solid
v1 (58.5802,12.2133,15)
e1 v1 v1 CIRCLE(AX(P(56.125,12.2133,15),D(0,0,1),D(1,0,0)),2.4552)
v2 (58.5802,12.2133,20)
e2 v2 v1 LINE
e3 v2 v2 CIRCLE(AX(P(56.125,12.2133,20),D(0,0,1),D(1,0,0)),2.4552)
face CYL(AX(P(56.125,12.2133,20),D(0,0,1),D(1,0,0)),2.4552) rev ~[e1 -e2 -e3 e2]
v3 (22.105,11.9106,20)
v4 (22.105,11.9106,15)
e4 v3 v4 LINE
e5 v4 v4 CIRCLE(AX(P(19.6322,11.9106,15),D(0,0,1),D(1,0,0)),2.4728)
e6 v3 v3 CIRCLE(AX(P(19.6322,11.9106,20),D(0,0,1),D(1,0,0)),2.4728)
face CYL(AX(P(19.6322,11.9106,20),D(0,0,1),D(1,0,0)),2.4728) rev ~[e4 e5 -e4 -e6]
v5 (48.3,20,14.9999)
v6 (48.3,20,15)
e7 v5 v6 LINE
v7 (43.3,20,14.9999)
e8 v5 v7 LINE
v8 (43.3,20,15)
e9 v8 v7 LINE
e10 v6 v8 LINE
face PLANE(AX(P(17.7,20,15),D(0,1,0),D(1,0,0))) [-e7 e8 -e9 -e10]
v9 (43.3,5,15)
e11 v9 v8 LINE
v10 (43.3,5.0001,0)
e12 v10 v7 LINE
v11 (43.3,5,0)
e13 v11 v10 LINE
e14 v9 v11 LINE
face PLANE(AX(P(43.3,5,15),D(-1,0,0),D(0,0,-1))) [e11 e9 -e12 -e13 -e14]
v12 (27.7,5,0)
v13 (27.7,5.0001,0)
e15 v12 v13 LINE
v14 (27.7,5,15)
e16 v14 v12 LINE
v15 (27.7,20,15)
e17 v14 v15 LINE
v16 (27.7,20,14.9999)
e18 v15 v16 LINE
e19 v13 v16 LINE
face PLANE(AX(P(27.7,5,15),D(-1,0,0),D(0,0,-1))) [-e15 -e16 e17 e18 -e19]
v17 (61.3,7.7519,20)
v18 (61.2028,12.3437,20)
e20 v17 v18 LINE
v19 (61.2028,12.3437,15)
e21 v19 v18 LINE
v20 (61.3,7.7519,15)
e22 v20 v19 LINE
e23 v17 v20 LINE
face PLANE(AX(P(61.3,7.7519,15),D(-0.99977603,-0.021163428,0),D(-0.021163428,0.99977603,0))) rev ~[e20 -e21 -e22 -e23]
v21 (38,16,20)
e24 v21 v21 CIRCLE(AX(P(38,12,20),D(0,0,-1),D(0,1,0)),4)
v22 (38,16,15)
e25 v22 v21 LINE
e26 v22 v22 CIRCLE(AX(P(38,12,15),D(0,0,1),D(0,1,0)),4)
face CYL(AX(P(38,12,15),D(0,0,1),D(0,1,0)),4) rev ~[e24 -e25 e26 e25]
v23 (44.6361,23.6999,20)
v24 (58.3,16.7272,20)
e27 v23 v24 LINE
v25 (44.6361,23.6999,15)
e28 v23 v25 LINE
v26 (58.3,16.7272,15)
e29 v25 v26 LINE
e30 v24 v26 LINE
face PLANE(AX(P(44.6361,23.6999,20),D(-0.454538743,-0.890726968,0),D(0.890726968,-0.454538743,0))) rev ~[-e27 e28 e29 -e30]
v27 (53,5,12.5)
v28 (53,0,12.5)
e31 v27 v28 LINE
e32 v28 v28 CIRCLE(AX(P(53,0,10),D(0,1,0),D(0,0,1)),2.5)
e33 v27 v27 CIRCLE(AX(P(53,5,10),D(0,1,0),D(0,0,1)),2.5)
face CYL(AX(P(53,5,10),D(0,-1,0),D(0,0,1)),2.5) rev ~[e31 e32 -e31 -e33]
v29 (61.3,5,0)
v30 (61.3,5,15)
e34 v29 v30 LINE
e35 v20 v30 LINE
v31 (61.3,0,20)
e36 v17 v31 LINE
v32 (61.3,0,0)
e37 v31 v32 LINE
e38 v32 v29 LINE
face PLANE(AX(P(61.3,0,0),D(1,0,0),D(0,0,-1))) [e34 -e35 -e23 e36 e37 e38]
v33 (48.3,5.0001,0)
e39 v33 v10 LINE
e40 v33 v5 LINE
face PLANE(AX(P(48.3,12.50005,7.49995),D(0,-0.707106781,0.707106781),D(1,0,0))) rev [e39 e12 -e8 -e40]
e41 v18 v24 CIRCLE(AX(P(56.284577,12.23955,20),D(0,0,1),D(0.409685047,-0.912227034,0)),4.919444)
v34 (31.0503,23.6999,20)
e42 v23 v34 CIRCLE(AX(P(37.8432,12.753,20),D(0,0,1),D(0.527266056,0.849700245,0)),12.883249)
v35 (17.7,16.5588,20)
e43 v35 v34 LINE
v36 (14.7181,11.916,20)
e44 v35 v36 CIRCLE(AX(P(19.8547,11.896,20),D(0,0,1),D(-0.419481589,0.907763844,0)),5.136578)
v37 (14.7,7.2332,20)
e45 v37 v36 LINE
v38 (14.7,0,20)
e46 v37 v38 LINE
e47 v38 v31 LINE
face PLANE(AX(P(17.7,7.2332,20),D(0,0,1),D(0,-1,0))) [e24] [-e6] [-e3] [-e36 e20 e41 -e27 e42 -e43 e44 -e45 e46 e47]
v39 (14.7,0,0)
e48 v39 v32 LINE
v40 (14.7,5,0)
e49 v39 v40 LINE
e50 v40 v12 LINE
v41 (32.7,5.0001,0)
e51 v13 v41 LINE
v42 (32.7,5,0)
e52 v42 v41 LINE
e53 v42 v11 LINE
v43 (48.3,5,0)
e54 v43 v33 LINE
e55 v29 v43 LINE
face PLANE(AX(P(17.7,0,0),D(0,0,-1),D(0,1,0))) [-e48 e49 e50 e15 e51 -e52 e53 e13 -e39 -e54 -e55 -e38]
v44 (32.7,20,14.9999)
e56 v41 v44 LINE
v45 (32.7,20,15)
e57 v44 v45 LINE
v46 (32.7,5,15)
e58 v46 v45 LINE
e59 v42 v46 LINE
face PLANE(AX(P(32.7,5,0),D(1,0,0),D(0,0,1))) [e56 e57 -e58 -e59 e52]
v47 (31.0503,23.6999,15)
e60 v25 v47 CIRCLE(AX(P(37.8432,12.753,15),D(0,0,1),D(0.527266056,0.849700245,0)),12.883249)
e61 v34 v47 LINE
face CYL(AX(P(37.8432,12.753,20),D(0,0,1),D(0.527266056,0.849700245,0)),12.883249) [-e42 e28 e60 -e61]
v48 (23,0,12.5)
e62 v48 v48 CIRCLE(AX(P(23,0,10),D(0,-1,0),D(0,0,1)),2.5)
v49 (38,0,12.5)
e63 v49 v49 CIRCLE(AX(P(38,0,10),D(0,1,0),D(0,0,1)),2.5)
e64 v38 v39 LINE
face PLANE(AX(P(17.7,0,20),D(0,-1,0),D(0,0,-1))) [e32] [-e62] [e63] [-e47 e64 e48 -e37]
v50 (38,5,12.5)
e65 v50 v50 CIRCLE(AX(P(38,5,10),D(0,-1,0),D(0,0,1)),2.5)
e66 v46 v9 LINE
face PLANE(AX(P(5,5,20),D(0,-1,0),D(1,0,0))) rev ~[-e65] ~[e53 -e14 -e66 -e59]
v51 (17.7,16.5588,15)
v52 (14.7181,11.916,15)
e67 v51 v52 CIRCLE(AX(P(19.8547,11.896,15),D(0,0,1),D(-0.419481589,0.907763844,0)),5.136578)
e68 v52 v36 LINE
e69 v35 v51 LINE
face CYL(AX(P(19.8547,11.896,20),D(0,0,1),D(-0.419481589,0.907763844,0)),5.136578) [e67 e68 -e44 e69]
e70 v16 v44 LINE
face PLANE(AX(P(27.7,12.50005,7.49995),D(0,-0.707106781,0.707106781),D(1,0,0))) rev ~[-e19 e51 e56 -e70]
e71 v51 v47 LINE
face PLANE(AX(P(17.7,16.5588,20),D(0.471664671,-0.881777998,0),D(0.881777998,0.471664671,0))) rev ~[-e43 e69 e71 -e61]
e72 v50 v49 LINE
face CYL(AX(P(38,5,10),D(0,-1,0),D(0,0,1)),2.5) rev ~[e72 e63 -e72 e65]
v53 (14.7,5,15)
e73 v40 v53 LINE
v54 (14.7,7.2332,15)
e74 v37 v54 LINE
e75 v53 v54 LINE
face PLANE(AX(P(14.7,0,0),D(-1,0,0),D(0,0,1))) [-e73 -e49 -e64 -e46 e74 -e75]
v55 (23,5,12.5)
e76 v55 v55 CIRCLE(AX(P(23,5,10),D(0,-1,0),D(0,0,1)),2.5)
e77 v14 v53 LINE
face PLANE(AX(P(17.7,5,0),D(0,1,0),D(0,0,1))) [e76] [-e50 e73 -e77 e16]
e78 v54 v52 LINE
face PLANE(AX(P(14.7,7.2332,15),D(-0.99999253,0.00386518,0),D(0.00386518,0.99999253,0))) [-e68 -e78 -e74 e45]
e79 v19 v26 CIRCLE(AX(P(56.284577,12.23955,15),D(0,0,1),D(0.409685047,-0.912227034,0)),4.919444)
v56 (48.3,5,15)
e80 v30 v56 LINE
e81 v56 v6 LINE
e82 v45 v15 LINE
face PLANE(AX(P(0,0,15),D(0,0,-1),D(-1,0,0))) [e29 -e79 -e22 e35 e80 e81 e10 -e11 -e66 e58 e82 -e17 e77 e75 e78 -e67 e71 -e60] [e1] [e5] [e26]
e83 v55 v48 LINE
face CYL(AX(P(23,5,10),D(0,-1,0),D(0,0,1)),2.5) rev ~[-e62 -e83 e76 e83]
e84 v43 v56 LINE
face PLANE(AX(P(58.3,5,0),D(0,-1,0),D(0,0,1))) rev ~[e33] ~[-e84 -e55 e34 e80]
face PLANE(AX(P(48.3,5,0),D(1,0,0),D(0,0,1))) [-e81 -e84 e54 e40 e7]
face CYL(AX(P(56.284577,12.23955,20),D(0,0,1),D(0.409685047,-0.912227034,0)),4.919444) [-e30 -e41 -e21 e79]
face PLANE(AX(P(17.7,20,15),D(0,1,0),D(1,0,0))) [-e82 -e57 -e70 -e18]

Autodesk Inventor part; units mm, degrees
ref_plane "YZ Plane" through (0, 0, 0) normal (1, 0, 0) x (0, 1, 0)
ref_plane "XZ Plane" through (0, 0, 0) normal (0, 1, 0) x (-1, 0, 0)
ref_plane "XY Plane" through (0, 0, 0) normal (0, 0, 1) x (1, 0, 0)
sketch "Sketch1" plane through (0, 0, 0) normal (0, 0, 1) x (1, 0, 0)
  line L0 (0, 0) -> (50, 0)
  line L1 (50, 0) -> (50, 50)
  line L2 (50, 50) -> (0, 0)
  dimension "d0" = 50
  dimension "d1" = 50
extrude "Extrusion1" add sketch "Sketch1" along normal blind 20
sketch "Sketch2" plane through (0, 0, 20) normal (0, 0, 1) x (1, 0, 0)
  line L0 (50, 50) -> (0, 0) projected
  line L1 (5, 5) -> (45, 5)
  line L2 (45, 5) -> (45, 45)
  line L3 (50, 0) -> (50, 50) projected
  line L4 (0, 0) -> (50, 0) projected
  dimension "d4" = 5
  dimension "d5" = 5
extrude "Extrusion2" cut sketch "Sketch2" against normal through all contours L2 L1 L0
extrude "Extrusion3" add sketch "Sketch2" against normal blind 5 contours L2 L1 L0
sketch "Sketch3" plane through (0, 0, 0) normal (0, 0, -1) x (-1, 0, 0)
  line L0 (-12.7, 0) -> (-50, 37.3)
  line L1 (-50, 0) -> (-50, 50) projected
  line L2 (-60.6675, 53.6604) -> (-50, 37.3)
  line L3 (-60.6675, 53.6604) -> (-37.4752, 61.571)
  line L4 (-37.4752, 61.571) -> (23.8314, -5.4888)
  line L5 (23.8314, -5.4888) -> (-5.9204, -12.6802)
  line L6 (-5.9204, -12.6802) -> (-12.7, 0)
  point P0 (0, 0)
  dimension "d12" = 12.7
  dimension "d13" = 12.7
extrude "Extrusion5" cut sketch "Sketch3" against normal through all
sketch "Sketch4" plane through (0, 0, 15) normal (0, 0, -1) x (-1, 0, 0)
  line L0 (-17.7, 5) -> (-45, 32.3) projected
  line L1 (-45, 5) -> (-45, 32.3) projected
  point P0 (0, 0)
  point P1 (-38, 12)
  dimension "d17" = 7
  dimension "d27" = 7
hole "Hole1" at (38, 12, 15) direction (0, 0, 1) diameter 8 depth 25.4 tip angle 118
sketch "Sketch5" plane through (45, 5, 0) normal (-1, 0, 0) x (0, 0, 1)
  line L0 (0, 0) -> (0, 27.3) projected
  line L1 (20, -5) -> (0, -5) projected
  point P0 (10, 22)
  point P1 (10, 7)
  dimension "d28" = 10
  dimension "d29" = 10
  dimension "d30" = 15
  dimension "d31" = 12
hole "Hole2" at (45, 27, 10) at (45, 12, 10) direction (1, 0, 0) diameter 5 depth 25.4 tip angle 118
sketch "Sketch6" plane through (45, 5, 15) normal (0, 1, 0) x (1, 0, 0)
  line L0 (-27.3, 15) -> (0, 15) projected
  line L1 (5, 15) -> (5, -5) projected
  point P0 (-45, 15)
  point P1 (-7, 5)
  point P2 (-22, 5)
  dimension "d39" = 15
  dimension "d40" = 10
  dimension "d41" = 10
  dimension "d42" = 12
hole "Hole3" at (38, 5, 10) at (23, 5, 10) direction (0, -1, 0) diameter 5 depth 25.4 tip angle 118
sketch "Sketch7" plane through (0, 0, 0) normal (0, 0, -1) x (-1, 0, 0)
  line L0 (-17.7, 5) -> (-17.7, 0)
  line L1 (-12.7, 0) -> (-50, 0) projected
  line L2 (-17.7, 0) -> (-12.7, 0)
  line L3 (-12.7, 0) -> (-17.7, 5)
  line L4 (-12.7, 0) -> (-17.7, 5) projected
  line L5 (-45, 32.3) -> (-50, 32.3)
  line L6 (-50, 0) -> (-50, 37.3) projected
  line L7 (-50, 32.3) -> (-50, 37.3)
  line L8 (-50, 37.3) -> (-45, 32.3)
  line L9 (-45, 32.3) -> (-50, 37.3) projected
  point P0 (0, 0)
extrude "Extrusion6" cut sketch "Sketch7" against normal blind 25.4
sketch "Sketch8" plane through (0, 0, 0) normal (0, 0, -1) x (-1, 0, 0)
  line L0 (-17.7, 0) -> (-50, 0) projected
  line L1 (-38, 0) -> (-60.6544, 0)
  line L2 (-60.6544, 0) -> (-60.6544, 37.4521)
  line L3 (-60.6544, 37.4521) -> (-38, 37.4521)
  line L4 (-38, 37.4521) -> (-38, 0)
  circle A0 centre (-38, 12) radius 4 projected
  point P0 (0, 0)
  dimension "d52" = 0
extrude "Extrusion7" cut sketch "Sketch8" against normal through all contours L0 L1 L2 L3 L4 A0 | A0 L4 picked at (-39.3236, 12.1607)
mirror "Mirror1" about plane through (38, 37.4521, 0) normal (1, 0, 0)
sketch "Sketch9" plane through (0, 0, 15) normal (0, 0, -1) x (-1, 0, 0)
  point P0 (0, 0)
fillet "Fillet1" radius 8 1 edges at (38, 25.3, 17.5)
sketch "Sketch10" plane through (0, 0, 20) normal (0, 0, 1) x (1, 0, 0)
  arc A0 (9.2418, 17.7) -> (17.7, 5) centre (17.0156, 13.7108) ccw
  arc A1 (58.3, 5) -> (66.7582, 17.7) centre (58.9844, 13.7108) ccw
  arc A2 (66.7582, 17.7) -> (9.2418, 17.7) centre (38, 2.9422) ccw
  line L0 (17.7, 5) -> (32.3431, 19.6431)
  line L1 (32.3431, 19.6431) -> (17.7, 5) projected
  line L2 (58.3, 5) -> (43.6569, 19.6431)
  arc A3 (43.6569, 19.6431) -> (32.3431, 19.6431) centre (38, 13.9863) ccw projected
  line L3 (58.3, 5) -> (43.6569, 19.6431) projected
  arc A4 (43.6569, 19.6431) -> (32.3431, 19.6431) centre (38, 13.9863) ccw
  point P0 (0, 0)
  dimension "d56" = 8.7376
  dimension "d57" = 8.4582
  dimension "d58" = 12.7
  dimension "d59" = 12.7
  dimension "d60" = 8.4582
  dimension "d61" = 0
extrude "Extrusion8" add sketch "Sketch10" against normal up to surface (5 mm away)
sketch "Sketch12" plane through (0, 0, 20) normal (0, 0, 1) x (1, 0, 0)
  arc A0 (17.7, 16.5588) -> (17.7, 7.2332) centre (19.8547, 11.896) ccw
  line L0 (17.7, 16.5588) -> (31.0503, 23.6999)
  arc A1 (44.6361, 23.6999) -> (31.0503, 23.6999) centre (37.8432, 12.753) ccw
  line L1 (58.3, 5) -> (63.7675, 1.1638)
  line L2 (63.7675, 1.1638) -> (73.9162, 6.1166)
  line L3 (73.9162, 6.1166) -> (79.7366, 33.6983)
  line L4 (79.7366, 33.6983) -> (40.092, 40.6944)
  line L5 (40.092, 40.6944) -> (0, 39.3618)
  line L6 (0, 39.3618) -> (-15.8768, 5)
  arc A2 (-15.8768, 5) -> (-14.2095, 1.1638) centre (-13.3336, 3.8249) ccw
  line L7 (-14.2095, 1.1638) -> (10.6084, -22.6037)
  line L8 (10.6084, -22.6037) -> (17.7, 5)
  line L9 (17.7, 7.2332) -> (17.7, 5)
  line L10 (58.3, 7.7519) -> (58.3, 5)
  line L11 (44.6361, 23.6999) -> (58.3, 16.7272)
  arc A3 (58.3, 7.7519) -> (58.3, 16.7272) centre (56.2845, 12.2396) ccw
  point P0 (0, 0)
extrude "Extrusion9" cut sketch "Sketch12" against normal through all
sketch "Sketch13" plane through (0, 0, 20) normal (0, 0, 1) x (1, 0, 0)
  circle A0 centre (19.6322, 11.9106) radius 2.4728
  circle A1 centre (56.125, 12.2133) radius 2.4552
  point P0 (0, 0)
extrude "Extrusion10" cut sketch "Sketch13" against normal blind 25.4
sketch "Sketch14" plane through (17.7, 5, 15) normal (0, 1, 0) x (1, 0, 0)
  line L0 (26.9361, 0) -> (13.3503, 0) projected
  line L1 (10, 15) -> (15, 15)
  line L2 (15, 15) -> (15, 0)
  line L3 (15, 0) -> (10, 0)
  line L4 (10, 0) -> (10, 15)
  line L5 (40.6, 15) -> (0, 15) projected
  line L6 (25.6, 15) -> (30.6, 15)
  line L7 (30.6, 15) -> (30.6, 0)
  line L8 (30.6, 0) -> (25.6, 0)
  line L9 (25.6, 0) -> (25.6, 15)
  line L10 (40.6, 15) -> (40.6, 0) projected
  line L11 (0, 15) -> (0, 0) projected
  point P0 (-17.7, 15)
  dimension "d51" = 0
  dimension "d83" = 10
  dimension "d84" = 5
  dimension "d85" = 10
  dimension "d86" = 5
extrude "Extrusion11" add sketch "Sketch14" along normal blind 15 contours L0 L9 L5 L7 L8 | L0 L3 L4 L1 L2
chamfer "Chamfer1" distance 15 angle 45 2 edges at (45.8, 20, 0) (30.2, 20, 0)
sketch "Sketch15" plane through (58.3, 0, 0) normal (1, 0, 0) x (0, 0, -1)
  line L0 (-20, 7.7519) -> (-20, 0) projected
  line L1 (-20, 0) -> (0, 0) projected
  line L2 (0, 0) -> (0, 5) projected
  line L3 (0, 5) -> (-15, 5) projected
  line L4 (-15, 7.7519) -> (-15, 5) projected
  line L5 (-20, 7.7519) -> (-15, 7.7519) projected
  point P0 (0, 0)
extrude "Extrusion12" add sketch "Sketch15" along normal blind 3
sketch "Sketch16" plane through (17.7, 0, 0) normal (-1, 0, 0) x (0, 0, 1)
  line L0 (20, 7.2332) -> (20, 0) projected
  line L1 (20, 7.2332) -> (15, 7.2332) projected
  line L2 (15, 5) -> (15, 7.2332) projected
  line L3 (0, 5) -> (15, 5) projected
  line L4 (0, 0) -> (0, 5) projected
  line L5 (20, 0) -> (0, 0) projected
extrude "Extrusion13" add sketch "Sketch16" along normal blind 3
sketch "Sketch17" plane through (0, 0, 15) normal (0, 0, -1) x (-1, 0, 0)
  line L0 (-14.7, 7.2332) -> (-14.7181, 11.916)
  arc A0 (-17.7, 7.2332) -> (-17.7, 16.5588) centre (-19.8547, 11.896) ccw projected
  line L1 (-14.7181, 11.916) -> (-19.0926, 6.6114)
  line L2 (-19.0926, 6.6114) -> (-14.7, 7.2332)
  line L3 (-61.3, 7.7519) -> (-61.2028, 12.3437)
  arc A1 (-58.3, 16.7272) -> (-58.3, 7.7519) centre (-56.2845, 12.2396) ccw projected
  line L4 (-61.2028, 12.3437) -> (-58.3, 7.7519)
  line L5 (-58.3, 7.7519) -> (-58.6002, 6.2246)
  line L6 (-58.6002, 6.2246) -> (-61.3, 7.7519)
  point P0 (0, 0)
extrude "Extrusion14" add sketch "Sketch17" against normal up to surface (5 mm away) contours L2 L1 L0 | L3 A1 L5 L6
properties part number "Leadscrew Mount"
